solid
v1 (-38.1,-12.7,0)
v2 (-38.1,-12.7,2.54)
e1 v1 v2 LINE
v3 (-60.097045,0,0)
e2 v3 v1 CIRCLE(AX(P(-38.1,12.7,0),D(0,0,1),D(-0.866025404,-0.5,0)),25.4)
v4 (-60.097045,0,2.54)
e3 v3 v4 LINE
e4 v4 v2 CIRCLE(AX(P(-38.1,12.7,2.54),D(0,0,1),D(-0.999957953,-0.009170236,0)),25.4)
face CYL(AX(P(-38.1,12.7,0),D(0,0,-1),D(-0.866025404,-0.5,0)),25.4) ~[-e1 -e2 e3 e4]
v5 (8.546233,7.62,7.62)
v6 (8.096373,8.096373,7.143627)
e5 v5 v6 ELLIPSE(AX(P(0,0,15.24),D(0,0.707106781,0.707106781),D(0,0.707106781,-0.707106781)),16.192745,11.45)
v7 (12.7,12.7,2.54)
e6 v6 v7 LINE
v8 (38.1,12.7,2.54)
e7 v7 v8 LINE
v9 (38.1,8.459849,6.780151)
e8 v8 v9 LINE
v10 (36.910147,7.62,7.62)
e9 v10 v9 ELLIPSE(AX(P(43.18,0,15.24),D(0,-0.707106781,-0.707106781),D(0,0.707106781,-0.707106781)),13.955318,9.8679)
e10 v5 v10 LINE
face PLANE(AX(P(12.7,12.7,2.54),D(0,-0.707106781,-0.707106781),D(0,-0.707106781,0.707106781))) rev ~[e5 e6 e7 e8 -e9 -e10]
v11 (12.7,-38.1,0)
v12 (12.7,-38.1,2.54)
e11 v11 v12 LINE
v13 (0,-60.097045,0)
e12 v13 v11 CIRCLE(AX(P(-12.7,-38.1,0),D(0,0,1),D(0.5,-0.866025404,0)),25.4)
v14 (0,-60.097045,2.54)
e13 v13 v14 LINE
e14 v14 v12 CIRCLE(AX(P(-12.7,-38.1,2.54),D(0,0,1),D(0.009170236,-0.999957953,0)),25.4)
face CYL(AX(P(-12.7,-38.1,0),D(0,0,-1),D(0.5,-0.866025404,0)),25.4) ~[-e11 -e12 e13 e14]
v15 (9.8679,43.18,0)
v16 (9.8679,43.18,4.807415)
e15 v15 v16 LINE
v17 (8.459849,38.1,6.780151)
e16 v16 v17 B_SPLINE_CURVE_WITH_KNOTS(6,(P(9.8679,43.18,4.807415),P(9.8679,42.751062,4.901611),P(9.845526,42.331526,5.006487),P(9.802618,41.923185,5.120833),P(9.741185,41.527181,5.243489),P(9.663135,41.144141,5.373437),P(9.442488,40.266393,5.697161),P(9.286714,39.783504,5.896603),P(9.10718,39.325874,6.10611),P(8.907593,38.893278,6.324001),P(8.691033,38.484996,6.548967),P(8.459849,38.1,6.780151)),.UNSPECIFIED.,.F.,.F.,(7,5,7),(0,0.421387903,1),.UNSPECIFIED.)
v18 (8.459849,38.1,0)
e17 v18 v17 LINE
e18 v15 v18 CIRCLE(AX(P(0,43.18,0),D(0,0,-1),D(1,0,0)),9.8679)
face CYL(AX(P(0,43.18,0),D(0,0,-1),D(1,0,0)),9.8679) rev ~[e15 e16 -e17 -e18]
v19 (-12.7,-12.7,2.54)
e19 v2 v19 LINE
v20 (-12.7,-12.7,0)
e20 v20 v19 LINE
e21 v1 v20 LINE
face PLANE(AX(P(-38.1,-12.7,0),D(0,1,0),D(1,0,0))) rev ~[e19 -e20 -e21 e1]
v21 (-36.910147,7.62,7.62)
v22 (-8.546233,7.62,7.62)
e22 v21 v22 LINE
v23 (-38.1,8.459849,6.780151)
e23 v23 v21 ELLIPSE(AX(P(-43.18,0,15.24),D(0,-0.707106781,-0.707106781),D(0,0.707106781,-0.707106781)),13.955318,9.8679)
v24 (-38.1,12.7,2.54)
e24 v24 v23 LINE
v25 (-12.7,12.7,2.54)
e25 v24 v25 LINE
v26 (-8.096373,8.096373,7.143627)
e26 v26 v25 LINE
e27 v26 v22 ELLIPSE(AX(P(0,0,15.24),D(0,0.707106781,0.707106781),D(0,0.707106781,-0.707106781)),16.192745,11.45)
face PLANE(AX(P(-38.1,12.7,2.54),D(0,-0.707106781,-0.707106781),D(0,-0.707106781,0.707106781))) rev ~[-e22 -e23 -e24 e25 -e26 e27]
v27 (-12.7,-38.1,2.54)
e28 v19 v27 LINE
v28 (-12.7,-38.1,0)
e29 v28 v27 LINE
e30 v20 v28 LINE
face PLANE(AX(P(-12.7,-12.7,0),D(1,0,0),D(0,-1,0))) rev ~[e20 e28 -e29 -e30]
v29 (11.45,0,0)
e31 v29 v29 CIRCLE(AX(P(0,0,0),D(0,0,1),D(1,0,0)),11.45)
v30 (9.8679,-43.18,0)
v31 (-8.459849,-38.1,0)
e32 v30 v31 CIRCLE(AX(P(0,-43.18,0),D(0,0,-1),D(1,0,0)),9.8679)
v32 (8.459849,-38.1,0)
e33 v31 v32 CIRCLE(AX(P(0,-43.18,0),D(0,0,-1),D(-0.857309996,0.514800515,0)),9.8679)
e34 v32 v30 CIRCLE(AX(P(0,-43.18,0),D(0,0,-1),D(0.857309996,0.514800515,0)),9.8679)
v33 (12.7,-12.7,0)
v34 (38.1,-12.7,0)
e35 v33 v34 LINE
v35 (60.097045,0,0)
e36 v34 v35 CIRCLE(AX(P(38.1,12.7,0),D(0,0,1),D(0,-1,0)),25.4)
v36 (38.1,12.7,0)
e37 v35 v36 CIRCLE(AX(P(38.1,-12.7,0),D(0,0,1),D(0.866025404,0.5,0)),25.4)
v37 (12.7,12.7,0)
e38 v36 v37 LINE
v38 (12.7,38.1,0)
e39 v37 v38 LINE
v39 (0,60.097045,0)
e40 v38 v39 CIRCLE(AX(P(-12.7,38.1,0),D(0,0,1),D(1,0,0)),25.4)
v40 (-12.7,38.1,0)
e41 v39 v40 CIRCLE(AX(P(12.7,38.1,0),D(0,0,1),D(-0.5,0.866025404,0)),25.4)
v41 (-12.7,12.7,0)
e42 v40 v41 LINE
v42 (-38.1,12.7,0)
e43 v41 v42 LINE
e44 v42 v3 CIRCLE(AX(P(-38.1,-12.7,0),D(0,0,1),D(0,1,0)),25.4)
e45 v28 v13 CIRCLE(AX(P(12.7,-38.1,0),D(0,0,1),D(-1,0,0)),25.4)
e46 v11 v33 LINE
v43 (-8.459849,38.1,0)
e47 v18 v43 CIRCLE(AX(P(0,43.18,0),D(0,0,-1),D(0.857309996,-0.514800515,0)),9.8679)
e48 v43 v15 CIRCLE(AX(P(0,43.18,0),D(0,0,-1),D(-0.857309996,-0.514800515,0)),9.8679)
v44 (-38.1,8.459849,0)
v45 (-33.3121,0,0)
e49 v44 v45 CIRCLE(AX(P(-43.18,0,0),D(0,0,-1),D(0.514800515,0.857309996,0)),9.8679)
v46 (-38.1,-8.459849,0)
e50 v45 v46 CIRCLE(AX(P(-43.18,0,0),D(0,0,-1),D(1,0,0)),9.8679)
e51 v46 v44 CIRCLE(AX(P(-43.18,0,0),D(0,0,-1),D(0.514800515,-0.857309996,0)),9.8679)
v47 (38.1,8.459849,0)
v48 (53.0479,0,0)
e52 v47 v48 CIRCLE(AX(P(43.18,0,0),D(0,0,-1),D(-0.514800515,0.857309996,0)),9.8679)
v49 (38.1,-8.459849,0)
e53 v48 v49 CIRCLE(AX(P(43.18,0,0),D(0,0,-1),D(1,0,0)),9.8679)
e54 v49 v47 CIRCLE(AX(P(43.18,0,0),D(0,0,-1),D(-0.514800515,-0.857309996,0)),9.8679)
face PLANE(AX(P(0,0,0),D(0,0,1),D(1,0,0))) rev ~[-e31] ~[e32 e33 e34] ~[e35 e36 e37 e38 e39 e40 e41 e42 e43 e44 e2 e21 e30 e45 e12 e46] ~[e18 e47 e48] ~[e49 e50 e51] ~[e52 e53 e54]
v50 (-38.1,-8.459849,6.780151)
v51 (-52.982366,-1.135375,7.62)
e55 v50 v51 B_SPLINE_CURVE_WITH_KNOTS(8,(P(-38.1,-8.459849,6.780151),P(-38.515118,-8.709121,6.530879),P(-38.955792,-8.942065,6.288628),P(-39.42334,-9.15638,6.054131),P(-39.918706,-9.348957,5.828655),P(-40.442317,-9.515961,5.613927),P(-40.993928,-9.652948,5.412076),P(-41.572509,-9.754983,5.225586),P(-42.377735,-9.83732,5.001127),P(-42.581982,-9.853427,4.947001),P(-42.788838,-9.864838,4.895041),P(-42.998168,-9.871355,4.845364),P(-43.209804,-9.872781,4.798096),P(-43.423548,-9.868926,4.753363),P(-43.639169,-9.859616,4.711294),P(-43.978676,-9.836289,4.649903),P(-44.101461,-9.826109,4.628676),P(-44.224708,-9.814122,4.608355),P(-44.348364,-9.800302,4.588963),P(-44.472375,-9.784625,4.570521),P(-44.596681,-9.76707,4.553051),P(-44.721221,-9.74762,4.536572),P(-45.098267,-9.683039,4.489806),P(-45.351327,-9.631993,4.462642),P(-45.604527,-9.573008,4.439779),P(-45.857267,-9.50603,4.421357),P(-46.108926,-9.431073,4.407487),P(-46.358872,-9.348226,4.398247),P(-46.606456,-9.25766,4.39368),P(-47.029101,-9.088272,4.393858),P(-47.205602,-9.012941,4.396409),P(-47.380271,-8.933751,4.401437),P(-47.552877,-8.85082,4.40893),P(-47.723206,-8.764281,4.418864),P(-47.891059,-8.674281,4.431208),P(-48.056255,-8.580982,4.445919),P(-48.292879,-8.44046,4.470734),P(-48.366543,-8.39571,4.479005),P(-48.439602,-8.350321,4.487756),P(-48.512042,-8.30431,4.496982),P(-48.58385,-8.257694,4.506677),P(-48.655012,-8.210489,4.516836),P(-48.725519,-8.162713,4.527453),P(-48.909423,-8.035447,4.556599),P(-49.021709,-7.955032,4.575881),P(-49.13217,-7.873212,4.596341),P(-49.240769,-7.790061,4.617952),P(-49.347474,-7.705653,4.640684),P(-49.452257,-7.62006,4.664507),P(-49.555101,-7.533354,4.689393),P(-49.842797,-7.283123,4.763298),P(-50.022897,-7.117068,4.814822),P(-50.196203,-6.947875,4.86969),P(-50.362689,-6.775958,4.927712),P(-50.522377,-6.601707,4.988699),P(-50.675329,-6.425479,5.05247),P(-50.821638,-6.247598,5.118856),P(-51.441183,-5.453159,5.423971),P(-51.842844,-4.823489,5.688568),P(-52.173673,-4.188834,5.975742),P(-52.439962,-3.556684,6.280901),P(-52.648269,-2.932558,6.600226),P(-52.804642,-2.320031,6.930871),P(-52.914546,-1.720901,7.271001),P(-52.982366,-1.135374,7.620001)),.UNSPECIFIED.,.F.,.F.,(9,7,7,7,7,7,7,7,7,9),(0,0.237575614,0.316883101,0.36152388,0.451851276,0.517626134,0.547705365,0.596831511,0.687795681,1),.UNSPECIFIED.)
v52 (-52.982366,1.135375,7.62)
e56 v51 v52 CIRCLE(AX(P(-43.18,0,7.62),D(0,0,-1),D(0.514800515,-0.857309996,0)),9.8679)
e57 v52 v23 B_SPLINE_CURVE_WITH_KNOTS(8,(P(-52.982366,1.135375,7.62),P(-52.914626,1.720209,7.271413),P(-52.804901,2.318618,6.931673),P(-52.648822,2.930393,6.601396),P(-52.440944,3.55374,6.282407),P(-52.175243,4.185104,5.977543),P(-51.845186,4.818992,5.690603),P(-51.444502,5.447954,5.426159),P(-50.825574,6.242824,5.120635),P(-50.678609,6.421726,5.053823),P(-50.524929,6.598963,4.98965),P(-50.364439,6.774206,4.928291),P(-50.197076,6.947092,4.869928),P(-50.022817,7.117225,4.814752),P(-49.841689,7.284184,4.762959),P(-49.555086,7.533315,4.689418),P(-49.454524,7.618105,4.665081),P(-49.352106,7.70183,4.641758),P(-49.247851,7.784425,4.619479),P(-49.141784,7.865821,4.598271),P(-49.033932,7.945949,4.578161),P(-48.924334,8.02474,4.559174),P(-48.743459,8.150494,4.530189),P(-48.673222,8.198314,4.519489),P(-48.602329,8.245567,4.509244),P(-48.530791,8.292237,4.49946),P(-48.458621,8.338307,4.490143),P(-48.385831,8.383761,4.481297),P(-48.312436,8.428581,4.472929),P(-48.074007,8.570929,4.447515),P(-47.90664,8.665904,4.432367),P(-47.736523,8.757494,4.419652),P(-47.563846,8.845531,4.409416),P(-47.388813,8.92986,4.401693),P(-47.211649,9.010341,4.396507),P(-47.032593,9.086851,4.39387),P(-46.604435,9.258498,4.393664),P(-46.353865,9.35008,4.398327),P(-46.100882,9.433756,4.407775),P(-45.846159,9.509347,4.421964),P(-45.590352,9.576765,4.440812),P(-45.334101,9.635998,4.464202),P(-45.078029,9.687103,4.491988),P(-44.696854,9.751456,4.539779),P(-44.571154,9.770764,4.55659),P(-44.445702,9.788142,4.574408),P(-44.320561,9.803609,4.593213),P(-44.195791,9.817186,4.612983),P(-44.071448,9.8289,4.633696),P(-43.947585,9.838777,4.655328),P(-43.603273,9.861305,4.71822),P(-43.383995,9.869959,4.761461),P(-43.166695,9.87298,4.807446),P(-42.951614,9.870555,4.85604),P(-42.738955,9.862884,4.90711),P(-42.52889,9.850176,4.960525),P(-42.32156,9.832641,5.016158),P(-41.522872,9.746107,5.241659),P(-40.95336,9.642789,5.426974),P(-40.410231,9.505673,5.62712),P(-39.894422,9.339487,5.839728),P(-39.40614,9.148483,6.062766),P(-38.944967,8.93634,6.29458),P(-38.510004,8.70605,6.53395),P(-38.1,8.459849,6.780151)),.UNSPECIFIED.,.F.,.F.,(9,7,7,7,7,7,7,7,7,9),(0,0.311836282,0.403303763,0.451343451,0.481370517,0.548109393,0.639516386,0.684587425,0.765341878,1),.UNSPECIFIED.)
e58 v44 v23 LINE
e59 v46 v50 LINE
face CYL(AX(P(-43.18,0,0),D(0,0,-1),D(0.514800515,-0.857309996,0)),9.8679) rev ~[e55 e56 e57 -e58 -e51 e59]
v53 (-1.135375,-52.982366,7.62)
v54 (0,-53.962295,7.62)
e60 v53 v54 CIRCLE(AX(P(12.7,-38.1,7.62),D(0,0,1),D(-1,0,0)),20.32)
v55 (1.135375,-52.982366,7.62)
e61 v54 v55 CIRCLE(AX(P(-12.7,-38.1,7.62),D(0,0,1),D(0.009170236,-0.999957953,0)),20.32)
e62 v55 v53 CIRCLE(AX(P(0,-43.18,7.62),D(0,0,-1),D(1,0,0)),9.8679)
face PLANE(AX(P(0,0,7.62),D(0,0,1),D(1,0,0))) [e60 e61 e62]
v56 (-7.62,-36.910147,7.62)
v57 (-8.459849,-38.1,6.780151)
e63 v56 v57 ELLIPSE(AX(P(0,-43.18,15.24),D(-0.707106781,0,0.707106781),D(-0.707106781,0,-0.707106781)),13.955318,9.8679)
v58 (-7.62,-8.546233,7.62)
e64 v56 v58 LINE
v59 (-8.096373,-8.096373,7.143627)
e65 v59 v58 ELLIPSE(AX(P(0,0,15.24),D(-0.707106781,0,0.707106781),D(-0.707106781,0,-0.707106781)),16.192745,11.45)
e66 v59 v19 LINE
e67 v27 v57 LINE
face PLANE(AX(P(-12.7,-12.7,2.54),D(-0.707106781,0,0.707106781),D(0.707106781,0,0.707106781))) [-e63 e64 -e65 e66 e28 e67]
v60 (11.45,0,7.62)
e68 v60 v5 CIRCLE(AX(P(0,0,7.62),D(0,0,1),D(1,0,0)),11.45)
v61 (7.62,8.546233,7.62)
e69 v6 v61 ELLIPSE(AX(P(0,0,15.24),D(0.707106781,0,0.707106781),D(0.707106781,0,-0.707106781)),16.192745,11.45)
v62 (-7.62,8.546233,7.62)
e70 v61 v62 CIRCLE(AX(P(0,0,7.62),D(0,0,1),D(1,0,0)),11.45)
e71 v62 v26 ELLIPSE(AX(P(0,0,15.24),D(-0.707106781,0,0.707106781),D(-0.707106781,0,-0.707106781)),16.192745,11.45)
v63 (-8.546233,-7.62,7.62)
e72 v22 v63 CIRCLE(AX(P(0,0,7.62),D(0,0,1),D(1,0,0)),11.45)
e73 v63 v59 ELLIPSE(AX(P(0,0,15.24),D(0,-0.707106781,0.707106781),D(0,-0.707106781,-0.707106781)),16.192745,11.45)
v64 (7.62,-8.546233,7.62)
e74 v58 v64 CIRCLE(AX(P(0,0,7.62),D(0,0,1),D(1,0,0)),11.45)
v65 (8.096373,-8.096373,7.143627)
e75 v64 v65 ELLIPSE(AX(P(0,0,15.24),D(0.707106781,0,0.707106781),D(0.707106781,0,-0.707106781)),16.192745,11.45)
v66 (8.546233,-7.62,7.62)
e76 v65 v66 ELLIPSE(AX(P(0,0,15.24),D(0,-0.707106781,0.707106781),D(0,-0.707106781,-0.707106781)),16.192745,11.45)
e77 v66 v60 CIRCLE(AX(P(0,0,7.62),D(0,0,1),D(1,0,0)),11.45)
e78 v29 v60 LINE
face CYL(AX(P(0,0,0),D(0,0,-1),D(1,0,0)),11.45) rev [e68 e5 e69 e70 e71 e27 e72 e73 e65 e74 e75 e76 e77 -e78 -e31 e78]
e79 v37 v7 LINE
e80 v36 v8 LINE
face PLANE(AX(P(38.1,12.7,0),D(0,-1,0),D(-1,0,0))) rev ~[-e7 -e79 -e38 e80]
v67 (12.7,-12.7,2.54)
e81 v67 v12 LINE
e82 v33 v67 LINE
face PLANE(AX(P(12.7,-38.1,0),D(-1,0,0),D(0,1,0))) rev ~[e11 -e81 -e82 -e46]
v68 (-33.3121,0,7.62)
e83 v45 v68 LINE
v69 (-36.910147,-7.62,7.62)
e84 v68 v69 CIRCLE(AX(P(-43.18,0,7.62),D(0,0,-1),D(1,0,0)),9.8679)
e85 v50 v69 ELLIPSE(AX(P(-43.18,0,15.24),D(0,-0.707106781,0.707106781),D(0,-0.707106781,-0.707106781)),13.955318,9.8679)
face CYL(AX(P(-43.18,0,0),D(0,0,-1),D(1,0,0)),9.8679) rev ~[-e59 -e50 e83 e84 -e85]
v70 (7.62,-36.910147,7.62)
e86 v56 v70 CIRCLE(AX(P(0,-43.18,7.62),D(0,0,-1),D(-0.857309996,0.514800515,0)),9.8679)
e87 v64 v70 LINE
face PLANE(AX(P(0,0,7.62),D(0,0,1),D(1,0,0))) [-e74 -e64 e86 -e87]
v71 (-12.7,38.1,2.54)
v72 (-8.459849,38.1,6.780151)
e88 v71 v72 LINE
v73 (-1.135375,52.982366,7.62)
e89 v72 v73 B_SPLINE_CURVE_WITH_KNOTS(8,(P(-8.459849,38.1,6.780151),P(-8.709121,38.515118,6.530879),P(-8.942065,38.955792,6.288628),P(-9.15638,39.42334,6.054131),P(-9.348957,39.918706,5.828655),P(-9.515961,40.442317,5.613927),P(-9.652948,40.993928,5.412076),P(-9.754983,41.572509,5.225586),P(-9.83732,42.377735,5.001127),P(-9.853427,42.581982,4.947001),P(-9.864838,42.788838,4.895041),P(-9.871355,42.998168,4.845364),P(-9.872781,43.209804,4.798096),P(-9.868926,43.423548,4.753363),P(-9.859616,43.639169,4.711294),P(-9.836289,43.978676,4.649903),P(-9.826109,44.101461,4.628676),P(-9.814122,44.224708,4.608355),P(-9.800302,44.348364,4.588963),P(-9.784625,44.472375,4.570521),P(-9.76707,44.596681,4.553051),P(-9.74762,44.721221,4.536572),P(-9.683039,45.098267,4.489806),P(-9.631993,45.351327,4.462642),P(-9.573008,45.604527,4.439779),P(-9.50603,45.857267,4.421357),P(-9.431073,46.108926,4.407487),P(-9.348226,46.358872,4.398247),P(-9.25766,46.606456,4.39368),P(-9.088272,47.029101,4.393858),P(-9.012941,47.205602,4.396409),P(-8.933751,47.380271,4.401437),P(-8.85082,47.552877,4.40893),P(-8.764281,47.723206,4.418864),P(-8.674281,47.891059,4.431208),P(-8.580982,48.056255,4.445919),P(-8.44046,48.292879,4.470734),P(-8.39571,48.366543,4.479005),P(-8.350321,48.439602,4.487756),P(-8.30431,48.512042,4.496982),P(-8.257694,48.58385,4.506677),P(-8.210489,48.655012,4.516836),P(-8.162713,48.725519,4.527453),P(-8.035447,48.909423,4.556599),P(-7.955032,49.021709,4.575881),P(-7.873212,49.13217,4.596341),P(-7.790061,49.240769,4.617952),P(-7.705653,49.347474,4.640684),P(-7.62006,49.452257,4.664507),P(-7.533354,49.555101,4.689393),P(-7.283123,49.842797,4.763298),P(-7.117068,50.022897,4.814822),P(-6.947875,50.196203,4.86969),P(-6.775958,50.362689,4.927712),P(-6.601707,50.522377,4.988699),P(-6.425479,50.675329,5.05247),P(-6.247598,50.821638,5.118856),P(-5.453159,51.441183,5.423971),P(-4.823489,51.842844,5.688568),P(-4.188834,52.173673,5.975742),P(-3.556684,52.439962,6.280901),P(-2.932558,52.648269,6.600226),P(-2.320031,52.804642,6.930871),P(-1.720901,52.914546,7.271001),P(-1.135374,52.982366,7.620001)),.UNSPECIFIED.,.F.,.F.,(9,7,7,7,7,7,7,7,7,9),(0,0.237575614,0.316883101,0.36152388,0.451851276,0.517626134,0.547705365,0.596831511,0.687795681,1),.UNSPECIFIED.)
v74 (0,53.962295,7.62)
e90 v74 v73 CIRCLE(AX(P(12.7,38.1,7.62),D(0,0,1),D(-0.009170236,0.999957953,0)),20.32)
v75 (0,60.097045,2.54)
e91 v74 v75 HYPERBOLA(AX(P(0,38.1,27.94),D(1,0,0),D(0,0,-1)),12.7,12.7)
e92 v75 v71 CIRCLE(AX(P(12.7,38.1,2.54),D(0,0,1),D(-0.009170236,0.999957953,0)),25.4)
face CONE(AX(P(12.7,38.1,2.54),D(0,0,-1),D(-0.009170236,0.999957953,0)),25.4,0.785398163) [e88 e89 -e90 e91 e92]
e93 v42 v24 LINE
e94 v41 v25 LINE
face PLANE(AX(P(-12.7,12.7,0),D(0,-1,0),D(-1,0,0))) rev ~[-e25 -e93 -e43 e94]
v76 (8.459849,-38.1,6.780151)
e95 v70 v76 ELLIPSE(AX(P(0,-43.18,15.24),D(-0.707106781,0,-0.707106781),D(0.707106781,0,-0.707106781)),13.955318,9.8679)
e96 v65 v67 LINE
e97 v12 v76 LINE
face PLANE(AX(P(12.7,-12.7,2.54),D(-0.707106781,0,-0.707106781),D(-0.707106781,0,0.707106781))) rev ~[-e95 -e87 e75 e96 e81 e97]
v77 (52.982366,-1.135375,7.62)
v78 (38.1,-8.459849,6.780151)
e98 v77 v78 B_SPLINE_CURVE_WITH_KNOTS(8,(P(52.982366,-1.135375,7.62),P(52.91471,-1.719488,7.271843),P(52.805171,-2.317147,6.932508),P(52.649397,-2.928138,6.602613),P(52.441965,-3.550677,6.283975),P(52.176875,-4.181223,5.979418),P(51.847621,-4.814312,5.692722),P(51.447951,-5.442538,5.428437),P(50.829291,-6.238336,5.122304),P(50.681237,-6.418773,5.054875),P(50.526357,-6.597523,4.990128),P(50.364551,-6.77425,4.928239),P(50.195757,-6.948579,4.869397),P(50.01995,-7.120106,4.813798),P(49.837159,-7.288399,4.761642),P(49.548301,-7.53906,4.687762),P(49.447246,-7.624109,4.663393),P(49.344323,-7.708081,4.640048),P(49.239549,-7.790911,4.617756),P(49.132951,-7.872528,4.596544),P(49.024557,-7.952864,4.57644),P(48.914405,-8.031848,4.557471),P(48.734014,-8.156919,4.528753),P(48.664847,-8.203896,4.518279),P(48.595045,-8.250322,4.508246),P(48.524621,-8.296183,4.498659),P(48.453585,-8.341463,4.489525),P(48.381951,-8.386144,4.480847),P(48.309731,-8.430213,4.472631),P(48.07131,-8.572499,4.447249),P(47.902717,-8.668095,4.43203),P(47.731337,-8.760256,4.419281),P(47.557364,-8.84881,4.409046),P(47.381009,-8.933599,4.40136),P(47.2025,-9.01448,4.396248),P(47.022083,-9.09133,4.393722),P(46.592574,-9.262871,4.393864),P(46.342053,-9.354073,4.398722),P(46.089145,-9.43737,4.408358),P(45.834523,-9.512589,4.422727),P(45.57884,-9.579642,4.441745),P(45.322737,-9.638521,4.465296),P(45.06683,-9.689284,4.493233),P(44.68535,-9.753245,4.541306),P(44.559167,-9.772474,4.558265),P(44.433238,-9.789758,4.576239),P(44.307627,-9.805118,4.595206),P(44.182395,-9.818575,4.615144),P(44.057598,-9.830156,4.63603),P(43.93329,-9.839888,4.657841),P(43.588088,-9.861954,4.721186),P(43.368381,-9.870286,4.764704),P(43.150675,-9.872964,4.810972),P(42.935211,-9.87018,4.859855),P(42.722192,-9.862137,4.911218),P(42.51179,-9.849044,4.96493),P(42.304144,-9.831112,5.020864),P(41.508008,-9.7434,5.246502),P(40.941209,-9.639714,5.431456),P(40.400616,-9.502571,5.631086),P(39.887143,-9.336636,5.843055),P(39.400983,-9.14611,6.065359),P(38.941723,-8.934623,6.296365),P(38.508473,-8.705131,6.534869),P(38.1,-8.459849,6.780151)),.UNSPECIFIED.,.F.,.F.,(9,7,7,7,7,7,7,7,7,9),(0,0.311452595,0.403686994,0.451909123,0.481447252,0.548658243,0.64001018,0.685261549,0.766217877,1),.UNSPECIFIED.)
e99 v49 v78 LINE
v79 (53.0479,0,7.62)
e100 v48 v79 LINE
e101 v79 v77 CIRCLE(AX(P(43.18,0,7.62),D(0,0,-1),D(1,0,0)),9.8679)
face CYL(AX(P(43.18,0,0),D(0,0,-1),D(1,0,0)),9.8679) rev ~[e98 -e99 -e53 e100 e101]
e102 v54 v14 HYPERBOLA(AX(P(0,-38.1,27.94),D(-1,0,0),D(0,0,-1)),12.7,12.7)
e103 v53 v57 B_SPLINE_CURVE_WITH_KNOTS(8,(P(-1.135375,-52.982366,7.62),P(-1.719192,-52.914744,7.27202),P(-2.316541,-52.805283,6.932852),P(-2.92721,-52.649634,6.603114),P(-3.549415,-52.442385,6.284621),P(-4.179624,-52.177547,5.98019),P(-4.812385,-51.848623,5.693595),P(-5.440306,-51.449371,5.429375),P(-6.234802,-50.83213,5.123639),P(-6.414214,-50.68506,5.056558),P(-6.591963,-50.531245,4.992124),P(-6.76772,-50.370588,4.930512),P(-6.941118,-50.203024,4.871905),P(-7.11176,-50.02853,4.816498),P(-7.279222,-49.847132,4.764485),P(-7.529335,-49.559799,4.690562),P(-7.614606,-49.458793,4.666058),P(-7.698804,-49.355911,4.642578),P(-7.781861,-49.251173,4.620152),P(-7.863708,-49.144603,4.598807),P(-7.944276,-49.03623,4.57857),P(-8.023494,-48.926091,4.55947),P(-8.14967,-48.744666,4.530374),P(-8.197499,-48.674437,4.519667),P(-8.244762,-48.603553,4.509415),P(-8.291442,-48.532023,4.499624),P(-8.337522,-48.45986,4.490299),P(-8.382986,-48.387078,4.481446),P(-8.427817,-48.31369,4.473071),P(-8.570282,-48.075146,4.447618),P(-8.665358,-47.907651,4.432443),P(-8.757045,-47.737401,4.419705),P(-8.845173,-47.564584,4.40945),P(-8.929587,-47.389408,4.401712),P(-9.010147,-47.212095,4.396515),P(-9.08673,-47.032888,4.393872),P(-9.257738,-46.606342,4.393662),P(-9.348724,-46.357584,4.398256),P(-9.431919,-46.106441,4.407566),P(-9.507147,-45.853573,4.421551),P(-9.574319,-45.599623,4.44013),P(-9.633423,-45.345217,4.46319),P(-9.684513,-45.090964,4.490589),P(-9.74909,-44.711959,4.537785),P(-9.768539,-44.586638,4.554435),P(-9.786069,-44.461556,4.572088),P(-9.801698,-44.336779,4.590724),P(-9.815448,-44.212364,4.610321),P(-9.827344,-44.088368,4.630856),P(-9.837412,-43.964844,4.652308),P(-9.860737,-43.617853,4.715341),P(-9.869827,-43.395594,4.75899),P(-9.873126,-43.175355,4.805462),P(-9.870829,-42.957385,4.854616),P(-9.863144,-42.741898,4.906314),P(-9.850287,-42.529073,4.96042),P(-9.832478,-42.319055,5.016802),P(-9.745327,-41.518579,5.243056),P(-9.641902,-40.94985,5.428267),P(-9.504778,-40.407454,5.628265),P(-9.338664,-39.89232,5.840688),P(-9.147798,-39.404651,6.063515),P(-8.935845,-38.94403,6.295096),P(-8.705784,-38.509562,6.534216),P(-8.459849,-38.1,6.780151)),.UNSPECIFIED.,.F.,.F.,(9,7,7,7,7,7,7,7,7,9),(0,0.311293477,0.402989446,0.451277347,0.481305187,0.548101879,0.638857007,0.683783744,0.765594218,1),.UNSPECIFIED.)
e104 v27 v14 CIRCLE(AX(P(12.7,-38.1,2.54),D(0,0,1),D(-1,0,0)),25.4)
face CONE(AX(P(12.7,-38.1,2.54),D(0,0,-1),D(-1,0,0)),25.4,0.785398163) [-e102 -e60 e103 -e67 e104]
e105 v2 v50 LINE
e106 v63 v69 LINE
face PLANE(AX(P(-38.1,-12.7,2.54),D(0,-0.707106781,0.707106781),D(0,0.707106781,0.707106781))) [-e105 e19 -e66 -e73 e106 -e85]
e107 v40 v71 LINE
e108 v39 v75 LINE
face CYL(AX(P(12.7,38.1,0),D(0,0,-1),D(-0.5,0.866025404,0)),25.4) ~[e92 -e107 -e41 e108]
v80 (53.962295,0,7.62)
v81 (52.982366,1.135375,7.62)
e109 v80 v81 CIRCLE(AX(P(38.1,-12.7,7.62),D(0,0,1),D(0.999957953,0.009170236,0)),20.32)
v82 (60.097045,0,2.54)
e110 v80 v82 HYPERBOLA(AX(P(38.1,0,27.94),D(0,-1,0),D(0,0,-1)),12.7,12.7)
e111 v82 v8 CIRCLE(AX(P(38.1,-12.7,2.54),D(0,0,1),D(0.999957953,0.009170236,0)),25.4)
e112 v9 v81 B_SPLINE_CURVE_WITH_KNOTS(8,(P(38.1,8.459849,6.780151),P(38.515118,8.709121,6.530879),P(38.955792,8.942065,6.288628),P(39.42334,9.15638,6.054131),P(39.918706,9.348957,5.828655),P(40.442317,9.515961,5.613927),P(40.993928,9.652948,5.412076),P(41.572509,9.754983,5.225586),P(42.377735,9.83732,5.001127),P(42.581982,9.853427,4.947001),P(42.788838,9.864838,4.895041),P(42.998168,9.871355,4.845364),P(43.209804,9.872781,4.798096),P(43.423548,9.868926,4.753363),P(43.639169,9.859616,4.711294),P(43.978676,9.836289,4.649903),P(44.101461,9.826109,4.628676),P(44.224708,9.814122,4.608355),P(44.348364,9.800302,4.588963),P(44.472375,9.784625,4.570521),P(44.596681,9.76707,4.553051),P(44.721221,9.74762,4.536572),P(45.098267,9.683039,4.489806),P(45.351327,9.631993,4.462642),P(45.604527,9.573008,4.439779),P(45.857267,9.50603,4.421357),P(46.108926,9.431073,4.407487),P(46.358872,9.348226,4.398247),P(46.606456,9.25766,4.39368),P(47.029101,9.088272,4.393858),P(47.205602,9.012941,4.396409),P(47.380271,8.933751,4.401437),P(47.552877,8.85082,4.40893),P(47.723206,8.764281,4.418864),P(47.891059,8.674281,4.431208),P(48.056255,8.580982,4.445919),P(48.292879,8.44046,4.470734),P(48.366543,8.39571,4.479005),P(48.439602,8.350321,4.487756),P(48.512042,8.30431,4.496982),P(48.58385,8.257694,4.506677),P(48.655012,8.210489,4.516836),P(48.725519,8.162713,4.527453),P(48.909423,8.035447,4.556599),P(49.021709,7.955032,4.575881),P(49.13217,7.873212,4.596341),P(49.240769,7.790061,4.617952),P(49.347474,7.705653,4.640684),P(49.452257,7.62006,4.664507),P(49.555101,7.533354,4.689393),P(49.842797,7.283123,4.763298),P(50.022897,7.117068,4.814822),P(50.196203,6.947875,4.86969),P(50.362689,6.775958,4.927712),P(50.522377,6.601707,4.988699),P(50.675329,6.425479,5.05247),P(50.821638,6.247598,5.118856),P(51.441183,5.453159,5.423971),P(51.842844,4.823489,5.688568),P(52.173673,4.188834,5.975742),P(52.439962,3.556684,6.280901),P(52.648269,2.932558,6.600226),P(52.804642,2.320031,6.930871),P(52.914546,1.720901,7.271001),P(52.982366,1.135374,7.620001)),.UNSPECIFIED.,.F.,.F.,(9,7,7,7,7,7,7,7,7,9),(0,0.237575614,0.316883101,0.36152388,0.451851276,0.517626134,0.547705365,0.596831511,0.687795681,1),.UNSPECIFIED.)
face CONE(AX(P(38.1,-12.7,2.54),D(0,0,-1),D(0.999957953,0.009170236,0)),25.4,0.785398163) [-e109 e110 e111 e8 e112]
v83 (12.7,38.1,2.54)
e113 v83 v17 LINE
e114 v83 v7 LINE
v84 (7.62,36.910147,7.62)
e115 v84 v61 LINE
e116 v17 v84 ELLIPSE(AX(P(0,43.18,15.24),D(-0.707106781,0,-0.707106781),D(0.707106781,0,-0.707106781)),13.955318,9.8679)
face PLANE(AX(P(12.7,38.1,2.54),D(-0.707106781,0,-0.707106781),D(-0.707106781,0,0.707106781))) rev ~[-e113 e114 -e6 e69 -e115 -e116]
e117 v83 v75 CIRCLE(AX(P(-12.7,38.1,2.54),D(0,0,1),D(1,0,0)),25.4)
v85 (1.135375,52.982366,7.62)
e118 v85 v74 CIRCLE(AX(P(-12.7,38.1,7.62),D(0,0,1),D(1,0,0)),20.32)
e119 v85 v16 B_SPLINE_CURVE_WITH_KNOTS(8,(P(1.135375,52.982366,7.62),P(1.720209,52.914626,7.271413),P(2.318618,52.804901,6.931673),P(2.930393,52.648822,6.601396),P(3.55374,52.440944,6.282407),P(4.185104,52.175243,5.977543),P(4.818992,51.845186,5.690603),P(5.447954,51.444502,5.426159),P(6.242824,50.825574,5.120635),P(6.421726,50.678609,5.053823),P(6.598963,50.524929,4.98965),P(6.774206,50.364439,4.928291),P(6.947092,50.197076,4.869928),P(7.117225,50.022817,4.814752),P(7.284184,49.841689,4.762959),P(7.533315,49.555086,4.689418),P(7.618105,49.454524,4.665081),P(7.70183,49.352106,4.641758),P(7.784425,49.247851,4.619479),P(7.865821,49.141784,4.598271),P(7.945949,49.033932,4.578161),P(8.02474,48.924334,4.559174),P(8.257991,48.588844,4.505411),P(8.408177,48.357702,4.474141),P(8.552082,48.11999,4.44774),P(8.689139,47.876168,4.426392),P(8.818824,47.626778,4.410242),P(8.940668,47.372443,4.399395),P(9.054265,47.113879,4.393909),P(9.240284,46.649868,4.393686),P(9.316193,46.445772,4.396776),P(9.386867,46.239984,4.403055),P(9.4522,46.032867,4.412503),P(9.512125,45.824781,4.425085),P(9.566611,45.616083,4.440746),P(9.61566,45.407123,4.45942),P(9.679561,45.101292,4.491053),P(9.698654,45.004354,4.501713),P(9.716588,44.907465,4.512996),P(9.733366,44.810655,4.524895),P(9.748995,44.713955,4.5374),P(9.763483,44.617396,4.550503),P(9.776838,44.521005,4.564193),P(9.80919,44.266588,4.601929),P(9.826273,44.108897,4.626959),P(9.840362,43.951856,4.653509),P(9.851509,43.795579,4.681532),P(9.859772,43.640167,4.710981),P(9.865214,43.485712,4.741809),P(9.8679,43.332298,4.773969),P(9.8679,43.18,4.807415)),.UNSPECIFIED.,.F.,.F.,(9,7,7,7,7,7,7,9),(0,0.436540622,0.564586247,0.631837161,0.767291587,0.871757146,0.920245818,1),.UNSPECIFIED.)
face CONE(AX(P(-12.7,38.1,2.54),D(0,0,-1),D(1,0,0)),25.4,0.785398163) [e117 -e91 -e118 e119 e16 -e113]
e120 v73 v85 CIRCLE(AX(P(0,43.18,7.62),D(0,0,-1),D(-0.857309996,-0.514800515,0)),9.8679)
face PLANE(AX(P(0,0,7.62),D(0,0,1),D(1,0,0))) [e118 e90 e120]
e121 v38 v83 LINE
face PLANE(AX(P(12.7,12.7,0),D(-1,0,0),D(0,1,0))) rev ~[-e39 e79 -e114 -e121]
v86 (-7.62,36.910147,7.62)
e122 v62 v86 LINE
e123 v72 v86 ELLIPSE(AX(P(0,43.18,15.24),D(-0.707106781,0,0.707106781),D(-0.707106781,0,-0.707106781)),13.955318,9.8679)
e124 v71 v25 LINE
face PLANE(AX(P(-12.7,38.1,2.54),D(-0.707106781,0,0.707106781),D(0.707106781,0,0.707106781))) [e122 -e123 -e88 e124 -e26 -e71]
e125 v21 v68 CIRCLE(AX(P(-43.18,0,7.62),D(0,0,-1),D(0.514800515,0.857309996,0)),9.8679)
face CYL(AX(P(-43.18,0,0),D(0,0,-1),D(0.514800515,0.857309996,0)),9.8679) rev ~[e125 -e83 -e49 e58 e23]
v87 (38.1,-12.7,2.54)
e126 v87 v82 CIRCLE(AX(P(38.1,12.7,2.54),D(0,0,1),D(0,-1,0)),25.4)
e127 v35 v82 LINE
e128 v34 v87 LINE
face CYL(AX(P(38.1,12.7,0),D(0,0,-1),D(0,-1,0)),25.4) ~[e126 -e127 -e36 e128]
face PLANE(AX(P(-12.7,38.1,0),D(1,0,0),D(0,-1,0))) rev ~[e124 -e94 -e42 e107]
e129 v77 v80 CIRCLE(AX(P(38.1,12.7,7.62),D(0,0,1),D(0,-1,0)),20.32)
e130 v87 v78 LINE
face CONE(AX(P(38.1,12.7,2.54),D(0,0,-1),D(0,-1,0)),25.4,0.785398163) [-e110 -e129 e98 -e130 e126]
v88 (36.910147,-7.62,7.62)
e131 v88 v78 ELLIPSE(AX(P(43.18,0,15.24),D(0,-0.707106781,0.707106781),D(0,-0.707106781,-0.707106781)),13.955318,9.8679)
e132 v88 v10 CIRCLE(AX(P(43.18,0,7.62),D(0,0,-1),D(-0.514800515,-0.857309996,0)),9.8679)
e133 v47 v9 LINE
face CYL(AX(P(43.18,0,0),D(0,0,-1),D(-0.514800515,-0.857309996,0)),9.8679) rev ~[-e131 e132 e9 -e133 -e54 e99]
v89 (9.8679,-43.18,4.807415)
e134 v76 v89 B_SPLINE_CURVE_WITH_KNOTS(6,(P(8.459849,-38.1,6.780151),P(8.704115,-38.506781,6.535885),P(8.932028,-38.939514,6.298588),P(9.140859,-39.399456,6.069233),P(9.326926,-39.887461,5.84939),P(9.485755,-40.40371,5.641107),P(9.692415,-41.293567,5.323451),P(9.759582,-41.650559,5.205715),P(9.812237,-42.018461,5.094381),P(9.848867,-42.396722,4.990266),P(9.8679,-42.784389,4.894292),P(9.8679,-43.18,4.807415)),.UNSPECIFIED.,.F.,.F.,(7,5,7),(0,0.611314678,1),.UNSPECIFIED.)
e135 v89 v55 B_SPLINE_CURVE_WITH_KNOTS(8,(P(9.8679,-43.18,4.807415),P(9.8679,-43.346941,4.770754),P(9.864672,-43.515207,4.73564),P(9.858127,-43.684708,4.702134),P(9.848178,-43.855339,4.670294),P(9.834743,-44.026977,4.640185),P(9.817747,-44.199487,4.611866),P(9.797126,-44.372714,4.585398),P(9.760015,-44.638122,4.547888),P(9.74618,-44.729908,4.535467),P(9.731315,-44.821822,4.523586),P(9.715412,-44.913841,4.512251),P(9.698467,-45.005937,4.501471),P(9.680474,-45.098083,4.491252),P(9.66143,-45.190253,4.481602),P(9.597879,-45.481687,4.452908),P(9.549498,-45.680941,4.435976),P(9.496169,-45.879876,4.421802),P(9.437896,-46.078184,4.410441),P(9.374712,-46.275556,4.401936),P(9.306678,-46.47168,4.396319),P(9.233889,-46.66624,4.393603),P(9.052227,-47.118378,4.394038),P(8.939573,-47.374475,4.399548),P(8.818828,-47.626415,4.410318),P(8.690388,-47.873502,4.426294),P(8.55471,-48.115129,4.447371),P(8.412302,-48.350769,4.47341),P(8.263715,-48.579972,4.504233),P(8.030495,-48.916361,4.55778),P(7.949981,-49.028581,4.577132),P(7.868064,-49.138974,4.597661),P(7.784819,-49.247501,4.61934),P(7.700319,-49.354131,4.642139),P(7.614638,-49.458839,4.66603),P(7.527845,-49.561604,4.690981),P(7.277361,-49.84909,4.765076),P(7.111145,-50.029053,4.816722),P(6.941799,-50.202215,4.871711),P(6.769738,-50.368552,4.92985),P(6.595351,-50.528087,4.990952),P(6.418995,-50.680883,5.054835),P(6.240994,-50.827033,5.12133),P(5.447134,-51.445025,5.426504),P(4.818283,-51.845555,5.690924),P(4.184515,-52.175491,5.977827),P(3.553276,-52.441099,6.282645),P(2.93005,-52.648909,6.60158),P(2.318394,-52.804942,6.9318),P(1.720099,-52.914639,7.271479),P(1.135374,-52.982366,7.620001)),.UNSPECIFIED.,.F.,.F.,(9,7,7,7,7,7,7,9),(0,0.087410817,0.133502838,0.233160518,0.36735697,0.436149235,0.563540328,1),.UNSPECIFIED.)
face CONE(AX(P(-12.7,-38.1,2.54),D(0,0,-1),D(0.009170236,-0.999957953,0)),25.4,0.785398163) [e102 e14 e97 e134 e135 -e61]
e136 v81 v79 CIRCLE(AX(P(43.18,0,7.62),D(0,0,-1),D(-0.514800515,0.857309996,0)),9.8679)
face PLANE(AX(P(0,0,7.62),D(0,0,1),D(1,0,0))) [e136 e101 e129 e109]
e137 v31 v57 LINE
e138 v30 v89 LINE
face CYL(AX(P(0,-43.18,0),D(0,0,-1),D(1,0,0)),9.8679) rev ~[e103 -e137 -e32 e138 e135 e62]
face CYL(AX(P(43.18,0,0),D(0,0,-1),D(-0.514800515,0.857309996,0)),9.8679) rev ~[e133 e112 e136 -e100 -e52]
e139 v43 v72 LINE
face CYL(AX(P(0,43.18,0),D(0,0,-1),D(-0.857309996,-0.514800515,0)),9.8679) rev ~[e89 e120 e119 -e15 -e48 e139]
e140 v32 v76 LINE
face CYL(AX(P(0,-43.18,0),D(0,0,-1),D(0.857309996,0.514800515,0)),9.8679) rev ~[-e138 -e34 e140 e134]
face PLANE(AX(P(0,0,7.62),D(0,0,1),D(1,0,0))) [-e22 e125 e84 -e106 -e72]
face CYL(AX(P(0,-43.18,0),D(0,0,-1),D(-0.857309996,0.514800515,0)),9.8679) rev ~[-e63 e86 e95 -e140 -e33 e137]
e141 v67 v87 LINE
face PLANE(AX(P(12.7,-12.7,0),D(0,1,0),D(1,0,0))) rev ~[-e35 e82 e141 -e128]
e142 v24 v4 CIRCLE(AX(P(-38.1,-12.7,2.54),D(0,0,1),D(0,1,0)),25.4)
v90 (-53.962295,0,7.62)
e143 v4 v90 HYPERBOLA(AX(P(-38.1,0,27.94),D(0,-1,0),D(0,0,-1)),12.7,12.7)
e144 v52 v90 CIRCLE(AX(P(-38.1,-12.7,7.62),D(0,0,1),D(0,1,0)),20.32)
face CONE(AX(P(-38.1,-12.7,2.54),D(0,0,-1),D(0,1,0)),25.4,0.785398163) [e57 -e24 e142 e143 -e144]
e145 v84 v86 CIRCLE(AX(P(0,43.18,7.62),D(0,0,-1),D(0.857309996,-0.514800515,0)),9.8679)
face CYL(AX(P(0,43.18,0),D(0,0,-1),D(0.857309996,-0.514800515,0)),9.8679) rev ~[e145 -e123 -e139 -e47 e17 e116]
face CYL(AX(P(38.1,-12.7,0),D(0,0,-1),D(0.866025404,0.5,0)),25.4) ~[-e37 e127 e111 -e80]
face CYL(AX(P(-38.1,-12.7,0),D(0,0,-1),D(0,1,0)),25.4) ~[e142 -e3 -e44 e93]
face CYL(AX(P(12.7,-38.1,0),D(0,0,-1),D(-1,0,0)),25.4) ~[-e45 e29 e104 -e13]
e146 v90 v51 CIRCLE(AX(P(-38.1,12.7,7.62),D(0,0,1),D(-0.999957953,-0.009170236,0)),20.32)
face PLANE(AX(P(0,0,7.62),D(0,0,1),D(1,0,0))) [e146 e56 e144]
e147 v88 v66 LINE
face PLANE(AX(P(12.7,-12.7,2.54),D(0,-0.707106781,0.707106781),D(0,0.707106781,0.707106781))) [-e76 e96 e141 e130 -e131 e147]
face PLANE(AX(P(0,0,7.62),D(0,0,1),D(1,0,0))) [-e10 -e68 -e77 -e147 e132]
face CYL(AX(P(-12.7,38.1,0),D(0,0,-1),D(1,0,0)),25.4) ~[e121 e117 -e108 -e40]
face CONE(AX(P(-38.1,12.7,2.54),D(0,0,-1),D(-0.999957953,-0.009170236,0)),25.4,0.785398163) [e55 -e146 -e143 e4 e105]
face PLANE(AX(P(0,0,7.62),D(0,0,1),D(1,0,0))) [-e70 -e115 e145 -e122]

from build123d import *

# Parameters (mm, degrees)
F0_W         = 25.4
F0_H         = 25.4
F0_R         = 11.45
F1_DEPTH     = 7.62
F2_T1_DEPTH  = 25.4
F2_T3_DEPTH  = 25.4
F2_T5_DEPTH  = 25.4
F2_T7_DEPTH  = 25.4
F2_T10_ANGLE = 89.4745768315
F2_T12_ANGLE = 89.4745768315
F2_T14_ANGLE = 89.4745768315
F2_T16_ANGLE = 89.4745768315
F2_T18_ANGLE = 89.4745768315
F2_T20_ANGLE = 89.4745768315
F2_T22_ANGLE = 89.4745768315
F2_T24_ANGLE = 89.4745768315
F2_T29_DEPTH = 38.4641495789
F2_T33_DEPTH = 38.4641495789
F2_T40_DEPTH = 38.4641495789
F2_T44_DEPTH = 38.4641495789
F2_T51_DEPTH = 38.4641495789
F2_T55_DEPTH = 38.4641495789
F2_T62_DEPTH = 38.4641495789
F2_T66_DEPTH = 38.4641495789


# Not quite as in the source:
# - a fillet or chamfer that OpenCascade refuses, or shapes differently, is made with other operations: its cross-section is extruded or revolved along the edge and cut away or added


with BuildPart() as f1:
    # F0 (on Top) → F1 (new body)
    with BuildSketch(Plane.XY):
        Rectangle(F0_W, F0_H)
        Circle(F0_R, mode=Mode.SUBTRACT)
        with BuildLine():
            Line((8.4598493137, -38.1), (12.7, -38.1))
            Line((12.7, -38.1), (12.7, -12.7))
            Line((12.7, -12.7), (-12.7, -12.7))
            Line((-12.7, -12.7), (-12.7, -38.1))
            Line((-12.7, -38.1), (-8.4598493137, -38.1))
            ThreePointArc((-8.4598493137, -38.1), (0, -33.3121), (8.4598493137, -38.1))
        make_face()
        with BuildLine():
            ThreePointArc((0, -60.0970452561), (9.2970452561, -50.8), (12.7, -38.1))
            Line((12.7, -38.1), (8.4598493137, -38.1))
            ThreePointArc((8.4598493137, -38.1), (9.5093742552, -40.5442360341), (9.8679, -43.18))
            ThreePointArc((9.8679, -43.18), (-2.6357639659, -52.6893742552), (-8.4598493137, -38.1))
            Line((-8.4598493137, -38.1), (-12.7, -38.1))
            ThreePointArc((-12.7, -38.1), (-9.2970452561, -50.8), (0, -60.0970452561))
        make_face()
        with BuildLine():
            Line((38.1, -8.4598493137), (38.1, -12.7))
            ThreePointArc((38.1, -12.7), (50.8, -9.2970452561), (60.0970452561, 0))
            ThreePointArc((60.0970452561, 0), (50.8, 9.2970452561), (38.1, 12.7))
            Line((38.1, 12.7), (38.1, 8.4598493137))
            ThreePointArc((38.1, 8.4598493137), (48.0403764468, 8.5879095946), (53.0479, 0))
            ThreePointArc((53.0479, 0), (48.0403764468, -8.5879095946), (38.1, -8.4598493137))
        make_face()
        with BuildLine():
            Line((12.7, 12.7), (12.7, -12.7))
            Line((12.7, -12.7), (38.1, -12.7))
            Line((38.1, -12.7), (38.1, -8.4598493137))
            ThreePointArc((38.1, -8.4598493137), (33.3121, 0), (38.1, 8.4598493137))
            Line((38.1, 8.4598493137), (38.1, 12.7))
            Line((38.1, 12.7), (12.7, 12.7))
        make_face()
        with BuildLine():
            Line((-12.7, 12.7), (12.7, 12.7))
            Line((12.7, 12.7), (12.7, 38.1))
            Line((12.7, 38.1), (8.4598493137, 38.1))
            ThreePointArc((8.4598493137, 38.1), (0, 33.3121), (-8.4598493137, 38.1))
            Line((-8.4598493137, 38.1), (-12.7, 38.1))
            Line((-12.7, 38.1), (-12.7, 12.7))
        make_face()
        with BuildLine():
            Line((8.4598493137, 38.1), (12.7, 38.1))
            ThreePointArc((12.7, 38.1), (9.2970452561, 50.8), (0, 60.0970452561))
            ThreePointArc((0, 60.0970452561), (-9.2970452561, 50.8), (-12.7, 38.1))
            Line((-12.7, 38.1), (-8.4598493137, 38.1))
            ThreePointArc((-8.4598493137, 38.1), (-2.6357639659, 52.6893742552), (9.8679, 43.18))
            ThreePointArc((9.8679, 43.18), (9.5093742552, 40.5442360341), (8.4598493137, 38.1))
        make_face()
        with BuildLine():
            ThreePointArc((-60.0970452561, 0), (-50.8, -9.2970452561), (-38.1, -12.7))
            Line((-38.1, -12.7), (-38.1, -8.4598493137))
            ThreePointArc((-38.1, -8.4598493137), (-53.0479, 0), (-38.1, 8.4598493137))
            Line((-38.1, 8.4598493137), (-38.1, 12.7))
            ThreePointArc((-38.1, 12.7), (-50.8, 9.2970452561), (-60.0970452561, 0))
        make_face()
        with BuildLine():
            Line((-38.1, -12.7), (-12.7, -12.7))
            Line((-12.7, -12.7), (-12.7, 12.7))
            Line((-12.7, 12.7), (-38.1, 12.7))
            Line((-38.1, 12.7), (-38.1, 8.4598493137))
            ThreePointArc((-38.1, 8.4598493137), (-34.5920904054, 4.8603764468), (-33.3121, 0))
            ThreePointArc((-33.3121, 0), (-34.5920904054, -4.8603764468), (-38.1, -8.4598493137))
            Line((-38.1, -8.4598493137), (-38.1, -12.7))
        make_face()
    extrude(amount=F1_DEPTH)

    # F2: chamfer of 5.08 on 8 edges, made by hand

    # F2_s2 → F2_t1 (cut)
    with BuildSketch(Plane.YZ.offset(-38.1)):
        Polygon((-12.7, 2.54), (-7.62, 7.62), (-12.7, 7.62), align=None)
        Polygon((12.7, 2.54), (7.62, 7.62), (12.7, 7.62), align=None)
    extrude(amount=F2_T1_DEPTH, mode=Mode.SUBTRACT)

    # F2_s4 → F2_t3 (cut)
    with BuildSketch(Plane.XZ.offset(12.7)):
        Polygon((-12.7, 2.54), (-7.62, 7.62), (-12.7, 7.62), align=None)
        Polygon((12.7, 2.54), (7.62, 7.62), (12.7, 7.62), align=None)
    extrude(amount=F2_T3_DEPTH, mode=Mode.SUBTRACT)

    # F2_s6 → F2_t5 (cut)
    with BuildSketch(Plane.YZ.offset(12.7)):
        Polygon((-12.7, 2.54), (-7.62, 7.62), (-12.7, 7.62), align=None)
        Polygon((12.7, 2.54), (7.62, 7.62), (12.7, 7.62), align=None)
    extrude(amount=F2_T5_DEPTH, mode=Mode.SUBTRACT)

    # F2_s8 → F2_t7 (cut)
    with BuildSketch(Plane.XZ.offset(-38.1)):
        Polygon((12.7, 2.54), (7.62, 7.62), (12.7, 7.62), align=None)
        Polygon((-12.7, 2.54), (-7.62, 7.62), (-12.7, 7.62), align=None)
    extrude(amount=F2_T7_DEPTH, mode=Mode.SUBTRACT)

    # F2_s9 → F2_t10 (revolve, cut)
    with BuildSketch(Plane.YZ.offset(-38.1)):
        Polygon((12.7, 2.54), (7.62, 7.62), (12.7, 7.62), align=None)
    revolve(axis=Axis((-38.1, -12.7, 7.62), (0, 0, 1)), revolution_arc=F2_T10_ANGLE, mode=Mode.SUBTRACT)

    # F2_s11 → F2_t12 (revolve, cut)
    with BuildSketch(Plane(origin=(13.0483033064, 0.1196610486, 0), x_dir=(0, 0, 1), z_dir=(0.9999579525, 0.0091702357, 0))):
        Polygon((2.54, -63.3819359967), (7.62, -58.3019359967), (7.62, -63.3819359967), align=None)
    revolve(axis=Axis((12.7, 38.1, 7.62), (0, 0, 1)), revolution_arc=F2_T12_ANGLE, mode=Mode.SUBTRACT)

    # F2_s13 → F2_t14 (revolve, cut)
    with BuildSketch(Plane.XZ.offset(-38.1)):
        Polygon((12.7, 2.54), (7.62, 7.62), (12.7, 7.62), align=None)
    revolve(axis=Axis((-12.7, 38.1, 7.62), (0, 0, 1)), revolution_arc=F2_T14_ANGLE, mode=Mode.SUBTRACT)

    # F2_s15 → F2_t16 (revolve, cut)
    with BuildSketch(Plane(origin=(0.1196610486, -13.0483033064, 0), x_dir=(0, 0, 1), z_dir=(0.0091702357, -0.9999579525, 0))):
        Polygon((2.54, -63.3819359967), (7.62, -58.3019359967), (7.62, -63.3819359967), align=None)
    revolve(axis=Axis((38.1, -12.7, 7.62), (0, 0, 1)), revolution_arc=F2_T16_ANGLE, mode=Mode.SUBTRACT)

    # F2_s17 → F2_t18 (revolve, cut)
    with BuildSketch(Plane.YZ.offset(38.1)):
        Polygon((-12.7, 2.54), (-7.62, 7.62), (-12.7, 7.62), align=None)
    revolve(axis=Axis((38.1, 12.7, 7.62), (0, 0, 1)), revolution_arc=F2_T18_ANGLE, mode=Mode.SUBTRACT)

    # F2_s19 → F2_t20 (revolve, cut)
    with BuildSketch(Plane(origin=(-13.0483033064, -0.1196610486, 0), x_dir=(0, 0, 1), z_dir=(-0.9999579525, -0.0091702357, 0))):
        Polygon((2.54, -63.3819359967), (7.62, -58.3019359967), (7.62, -63.3819359967), align=None)
    revolve(axis=Axis((-12.7, -38.1, 7.62), (0, 0, 1)), revolution_arc=F2_T20_ANGLE, mode=Mode.SUBTRACT)

    # F2_s21 → F2_t22 (revolve, cut)
    with BuildSketch(Plane.XZ.offset(38.1)):
        Polygon((-12.7, 2.54), (-7.62, 7.62), (-12.7, 7.62), align=None)
    revolve(axis=Axis((12.7, -38.1, 7.62), (0, 0, 1)), revolution_arc=F2_T22_ANGLE, mode=Mode.SUBTRACT)

    # F2_s23 → F2_t24 (revolve, cut)
    with BuildSketch(Plane(origin=(-0.1196610486, 13.0483033064, 0), x_dir=(0, 0, 1), z_dir=(-0.0091702357, 0.9999579525, 0))):
        Polygon((2.54, -63.3819359967), (7.62, -58.3019359967), (7.62, -63.3819359967), align=None)
    revolve(axis=Axis((-38.1, 12.7, 7.62), (0, 0, 1)), revolution_arc=F2_T24_ANGLE, mode=Mode.SUBTRACT)


with BuildPart() as f2_tool27:
    # F2_s28 → F2_t29 (new body)
    with BuildSketch(Plane.YZ.offset(-38.1)):
        Polygon((-12.7, 2.54), (-7.62, 7.62), (-12.7, 7.62), align=None)
    extrude(amount=F2_T29_DEPTH)

    split(bisect_by=Plane.YZ.offset(-12.7), keep=Keep.TOP)


with BuildPart() as f2_tool31:
    # F2_s32 → F2_t33 (new body)
    with BuildSketch(Plane.XZ.offset(-0.3641495789)):
        Polygon((-12.7, 2.54), (-7.62, 7.62), (-12.7, 7.62), align=None)
    extrude(amount=F2_T33_DEPTH)

    split(bisect_by=Plane.XZ.offset(12.7), keep=Keep.BOTTOM)


with BuildPart() as f2_tool27_1:
    add(f2_tool27.part)

    # F2_t35: intersect F2_tool31
    add(f2_tool31.part, mode=Mode.INTERSECT)


with BuildPart() as f1_1:
    add(f1.part)

    # F2_t25: cut F2_tool27
    add(f2_tool27_1.part, mode=Mode.SUBTRACT)


with BuildPart() as f2_tool38:
    # F2_s39 → F2_t40 (new body)
    with BuildSketch(Plane.XZ.offset(38.1)):
        Polygon((12.7, 2.54), (7.62, 7.62), (12.7, 7.62), align=None)
    extrude(amount=-F2_T40_DEPTH)

    split(bisect_by=Plane.XZ.offset(12.7), keep=Keep.BOTTOM)


with BuildPart() as f2_tool42:
    # F2_s43 → F2_t44 (new body)
    with BuildSketch(Plane.YZ.offset(-0.3641495789)):
        Polygon((-12.7, 2.54), (-7.62, 7.62), (-12.7, 7.62), align=None)
    extrude(amount=F2_T44_DEPTH)

    split(bisect_by=Plane.YZ.offset(12.7), keep=Keep.BOTTOM)


with BuildPart() as f2_tool38_1:
    add(f2_tool38.part)

    # F2_t46: intersect F2_tool42
    add(f2_tool42.part, mode=Mode.INTERSECT)


with BuildPart() as f1_2:
    add(f1_1.part)

    # F2_t36: cut F2_tool38
    add(f2_tool38_1.part, mode=Mode.SUBTRACT)


with BuildPart() as f2_tool49:
    # F2_s50 → F2_t51 (new body)
    with BuildSketch(Plane.YZ.offset(38.1)):
        Polygon((12.7, 2.54), (7.62, 7.62), (12.7, 7.62), align=None)
    extrude(amount=-F2_T51_DEPTH)

    split(bisect_by=Plane.YZ.offset(12.7), keep=Keep.BOTTOM)


with BuildPart() as f2_tool53:
    # F2_s54 → F2_t55 (new body)
    with BuildSketch(Plane.XZ.offset(0.3641495789)):
        Polygon((12.7, 2.54), (7.62, 7.62), (12.7, 7.62), align=None)
    extrude(amount=-F2_T55_DEPTH)

    split(bisect_by=Plane.XZ.offset(-12.7), keep=Keep.TOP)


with BuildPart() as f2_tool49_1:
    add(f2_tool49.part)

    # F2_t57: intersect F2_tool53
    add(f2_tool53.part, mode=Mode.INTERSECT)


with BuildPart() as f1_3:
    add(f1_2.part)

    # F2_t47: cut F2_tool49
    add(f2_tool49_1.part, mode=Mode.SUBTRACT)


with BuildPart() as f2_tool60:
    # F2_s61 → F2_t62 (new body)
    with BuildSketch(Plane.XZ.offset(-38.1)):
        Polygon((-12.7, 2.54), (-7.62, 7.62), (-12.7, 7.62), align=None)
    extrude(amount=F2_T62_DEPTH)

    split(bisect_by=Plane.XZ.offset(-12.7), keep=Keep.TOP)


with BuildPart() as f2_tool64:
    # F2_s65 → F2_t66 (new body)
    with BuildSketch(Plane.YZ.offset(0.3641495789)):
        Polygon((12.7, 2.54), (7.62, 7.62), (12.7, 7.62), align=None)
    extrude(amount=-F2_T66_DEPTH)

    split(bisect_by=Plane.YZ.offset(-12.7), keep=Keep.TOP)


with BuildPart() as f2_tool60_1:
    add(f2_tool60.part)

    # F2_t68: intersect F2_tool64
    add(f2_tool64.part, mode=Mode.INTERSECT)


with BuildPart() as f1_4:
    add(f1_3.part)

    # F2_t58: cut F2_tool60
    add(f2_tool60_1.part, mode=Mode.SUBTRACT)


solid = f1_4.part
